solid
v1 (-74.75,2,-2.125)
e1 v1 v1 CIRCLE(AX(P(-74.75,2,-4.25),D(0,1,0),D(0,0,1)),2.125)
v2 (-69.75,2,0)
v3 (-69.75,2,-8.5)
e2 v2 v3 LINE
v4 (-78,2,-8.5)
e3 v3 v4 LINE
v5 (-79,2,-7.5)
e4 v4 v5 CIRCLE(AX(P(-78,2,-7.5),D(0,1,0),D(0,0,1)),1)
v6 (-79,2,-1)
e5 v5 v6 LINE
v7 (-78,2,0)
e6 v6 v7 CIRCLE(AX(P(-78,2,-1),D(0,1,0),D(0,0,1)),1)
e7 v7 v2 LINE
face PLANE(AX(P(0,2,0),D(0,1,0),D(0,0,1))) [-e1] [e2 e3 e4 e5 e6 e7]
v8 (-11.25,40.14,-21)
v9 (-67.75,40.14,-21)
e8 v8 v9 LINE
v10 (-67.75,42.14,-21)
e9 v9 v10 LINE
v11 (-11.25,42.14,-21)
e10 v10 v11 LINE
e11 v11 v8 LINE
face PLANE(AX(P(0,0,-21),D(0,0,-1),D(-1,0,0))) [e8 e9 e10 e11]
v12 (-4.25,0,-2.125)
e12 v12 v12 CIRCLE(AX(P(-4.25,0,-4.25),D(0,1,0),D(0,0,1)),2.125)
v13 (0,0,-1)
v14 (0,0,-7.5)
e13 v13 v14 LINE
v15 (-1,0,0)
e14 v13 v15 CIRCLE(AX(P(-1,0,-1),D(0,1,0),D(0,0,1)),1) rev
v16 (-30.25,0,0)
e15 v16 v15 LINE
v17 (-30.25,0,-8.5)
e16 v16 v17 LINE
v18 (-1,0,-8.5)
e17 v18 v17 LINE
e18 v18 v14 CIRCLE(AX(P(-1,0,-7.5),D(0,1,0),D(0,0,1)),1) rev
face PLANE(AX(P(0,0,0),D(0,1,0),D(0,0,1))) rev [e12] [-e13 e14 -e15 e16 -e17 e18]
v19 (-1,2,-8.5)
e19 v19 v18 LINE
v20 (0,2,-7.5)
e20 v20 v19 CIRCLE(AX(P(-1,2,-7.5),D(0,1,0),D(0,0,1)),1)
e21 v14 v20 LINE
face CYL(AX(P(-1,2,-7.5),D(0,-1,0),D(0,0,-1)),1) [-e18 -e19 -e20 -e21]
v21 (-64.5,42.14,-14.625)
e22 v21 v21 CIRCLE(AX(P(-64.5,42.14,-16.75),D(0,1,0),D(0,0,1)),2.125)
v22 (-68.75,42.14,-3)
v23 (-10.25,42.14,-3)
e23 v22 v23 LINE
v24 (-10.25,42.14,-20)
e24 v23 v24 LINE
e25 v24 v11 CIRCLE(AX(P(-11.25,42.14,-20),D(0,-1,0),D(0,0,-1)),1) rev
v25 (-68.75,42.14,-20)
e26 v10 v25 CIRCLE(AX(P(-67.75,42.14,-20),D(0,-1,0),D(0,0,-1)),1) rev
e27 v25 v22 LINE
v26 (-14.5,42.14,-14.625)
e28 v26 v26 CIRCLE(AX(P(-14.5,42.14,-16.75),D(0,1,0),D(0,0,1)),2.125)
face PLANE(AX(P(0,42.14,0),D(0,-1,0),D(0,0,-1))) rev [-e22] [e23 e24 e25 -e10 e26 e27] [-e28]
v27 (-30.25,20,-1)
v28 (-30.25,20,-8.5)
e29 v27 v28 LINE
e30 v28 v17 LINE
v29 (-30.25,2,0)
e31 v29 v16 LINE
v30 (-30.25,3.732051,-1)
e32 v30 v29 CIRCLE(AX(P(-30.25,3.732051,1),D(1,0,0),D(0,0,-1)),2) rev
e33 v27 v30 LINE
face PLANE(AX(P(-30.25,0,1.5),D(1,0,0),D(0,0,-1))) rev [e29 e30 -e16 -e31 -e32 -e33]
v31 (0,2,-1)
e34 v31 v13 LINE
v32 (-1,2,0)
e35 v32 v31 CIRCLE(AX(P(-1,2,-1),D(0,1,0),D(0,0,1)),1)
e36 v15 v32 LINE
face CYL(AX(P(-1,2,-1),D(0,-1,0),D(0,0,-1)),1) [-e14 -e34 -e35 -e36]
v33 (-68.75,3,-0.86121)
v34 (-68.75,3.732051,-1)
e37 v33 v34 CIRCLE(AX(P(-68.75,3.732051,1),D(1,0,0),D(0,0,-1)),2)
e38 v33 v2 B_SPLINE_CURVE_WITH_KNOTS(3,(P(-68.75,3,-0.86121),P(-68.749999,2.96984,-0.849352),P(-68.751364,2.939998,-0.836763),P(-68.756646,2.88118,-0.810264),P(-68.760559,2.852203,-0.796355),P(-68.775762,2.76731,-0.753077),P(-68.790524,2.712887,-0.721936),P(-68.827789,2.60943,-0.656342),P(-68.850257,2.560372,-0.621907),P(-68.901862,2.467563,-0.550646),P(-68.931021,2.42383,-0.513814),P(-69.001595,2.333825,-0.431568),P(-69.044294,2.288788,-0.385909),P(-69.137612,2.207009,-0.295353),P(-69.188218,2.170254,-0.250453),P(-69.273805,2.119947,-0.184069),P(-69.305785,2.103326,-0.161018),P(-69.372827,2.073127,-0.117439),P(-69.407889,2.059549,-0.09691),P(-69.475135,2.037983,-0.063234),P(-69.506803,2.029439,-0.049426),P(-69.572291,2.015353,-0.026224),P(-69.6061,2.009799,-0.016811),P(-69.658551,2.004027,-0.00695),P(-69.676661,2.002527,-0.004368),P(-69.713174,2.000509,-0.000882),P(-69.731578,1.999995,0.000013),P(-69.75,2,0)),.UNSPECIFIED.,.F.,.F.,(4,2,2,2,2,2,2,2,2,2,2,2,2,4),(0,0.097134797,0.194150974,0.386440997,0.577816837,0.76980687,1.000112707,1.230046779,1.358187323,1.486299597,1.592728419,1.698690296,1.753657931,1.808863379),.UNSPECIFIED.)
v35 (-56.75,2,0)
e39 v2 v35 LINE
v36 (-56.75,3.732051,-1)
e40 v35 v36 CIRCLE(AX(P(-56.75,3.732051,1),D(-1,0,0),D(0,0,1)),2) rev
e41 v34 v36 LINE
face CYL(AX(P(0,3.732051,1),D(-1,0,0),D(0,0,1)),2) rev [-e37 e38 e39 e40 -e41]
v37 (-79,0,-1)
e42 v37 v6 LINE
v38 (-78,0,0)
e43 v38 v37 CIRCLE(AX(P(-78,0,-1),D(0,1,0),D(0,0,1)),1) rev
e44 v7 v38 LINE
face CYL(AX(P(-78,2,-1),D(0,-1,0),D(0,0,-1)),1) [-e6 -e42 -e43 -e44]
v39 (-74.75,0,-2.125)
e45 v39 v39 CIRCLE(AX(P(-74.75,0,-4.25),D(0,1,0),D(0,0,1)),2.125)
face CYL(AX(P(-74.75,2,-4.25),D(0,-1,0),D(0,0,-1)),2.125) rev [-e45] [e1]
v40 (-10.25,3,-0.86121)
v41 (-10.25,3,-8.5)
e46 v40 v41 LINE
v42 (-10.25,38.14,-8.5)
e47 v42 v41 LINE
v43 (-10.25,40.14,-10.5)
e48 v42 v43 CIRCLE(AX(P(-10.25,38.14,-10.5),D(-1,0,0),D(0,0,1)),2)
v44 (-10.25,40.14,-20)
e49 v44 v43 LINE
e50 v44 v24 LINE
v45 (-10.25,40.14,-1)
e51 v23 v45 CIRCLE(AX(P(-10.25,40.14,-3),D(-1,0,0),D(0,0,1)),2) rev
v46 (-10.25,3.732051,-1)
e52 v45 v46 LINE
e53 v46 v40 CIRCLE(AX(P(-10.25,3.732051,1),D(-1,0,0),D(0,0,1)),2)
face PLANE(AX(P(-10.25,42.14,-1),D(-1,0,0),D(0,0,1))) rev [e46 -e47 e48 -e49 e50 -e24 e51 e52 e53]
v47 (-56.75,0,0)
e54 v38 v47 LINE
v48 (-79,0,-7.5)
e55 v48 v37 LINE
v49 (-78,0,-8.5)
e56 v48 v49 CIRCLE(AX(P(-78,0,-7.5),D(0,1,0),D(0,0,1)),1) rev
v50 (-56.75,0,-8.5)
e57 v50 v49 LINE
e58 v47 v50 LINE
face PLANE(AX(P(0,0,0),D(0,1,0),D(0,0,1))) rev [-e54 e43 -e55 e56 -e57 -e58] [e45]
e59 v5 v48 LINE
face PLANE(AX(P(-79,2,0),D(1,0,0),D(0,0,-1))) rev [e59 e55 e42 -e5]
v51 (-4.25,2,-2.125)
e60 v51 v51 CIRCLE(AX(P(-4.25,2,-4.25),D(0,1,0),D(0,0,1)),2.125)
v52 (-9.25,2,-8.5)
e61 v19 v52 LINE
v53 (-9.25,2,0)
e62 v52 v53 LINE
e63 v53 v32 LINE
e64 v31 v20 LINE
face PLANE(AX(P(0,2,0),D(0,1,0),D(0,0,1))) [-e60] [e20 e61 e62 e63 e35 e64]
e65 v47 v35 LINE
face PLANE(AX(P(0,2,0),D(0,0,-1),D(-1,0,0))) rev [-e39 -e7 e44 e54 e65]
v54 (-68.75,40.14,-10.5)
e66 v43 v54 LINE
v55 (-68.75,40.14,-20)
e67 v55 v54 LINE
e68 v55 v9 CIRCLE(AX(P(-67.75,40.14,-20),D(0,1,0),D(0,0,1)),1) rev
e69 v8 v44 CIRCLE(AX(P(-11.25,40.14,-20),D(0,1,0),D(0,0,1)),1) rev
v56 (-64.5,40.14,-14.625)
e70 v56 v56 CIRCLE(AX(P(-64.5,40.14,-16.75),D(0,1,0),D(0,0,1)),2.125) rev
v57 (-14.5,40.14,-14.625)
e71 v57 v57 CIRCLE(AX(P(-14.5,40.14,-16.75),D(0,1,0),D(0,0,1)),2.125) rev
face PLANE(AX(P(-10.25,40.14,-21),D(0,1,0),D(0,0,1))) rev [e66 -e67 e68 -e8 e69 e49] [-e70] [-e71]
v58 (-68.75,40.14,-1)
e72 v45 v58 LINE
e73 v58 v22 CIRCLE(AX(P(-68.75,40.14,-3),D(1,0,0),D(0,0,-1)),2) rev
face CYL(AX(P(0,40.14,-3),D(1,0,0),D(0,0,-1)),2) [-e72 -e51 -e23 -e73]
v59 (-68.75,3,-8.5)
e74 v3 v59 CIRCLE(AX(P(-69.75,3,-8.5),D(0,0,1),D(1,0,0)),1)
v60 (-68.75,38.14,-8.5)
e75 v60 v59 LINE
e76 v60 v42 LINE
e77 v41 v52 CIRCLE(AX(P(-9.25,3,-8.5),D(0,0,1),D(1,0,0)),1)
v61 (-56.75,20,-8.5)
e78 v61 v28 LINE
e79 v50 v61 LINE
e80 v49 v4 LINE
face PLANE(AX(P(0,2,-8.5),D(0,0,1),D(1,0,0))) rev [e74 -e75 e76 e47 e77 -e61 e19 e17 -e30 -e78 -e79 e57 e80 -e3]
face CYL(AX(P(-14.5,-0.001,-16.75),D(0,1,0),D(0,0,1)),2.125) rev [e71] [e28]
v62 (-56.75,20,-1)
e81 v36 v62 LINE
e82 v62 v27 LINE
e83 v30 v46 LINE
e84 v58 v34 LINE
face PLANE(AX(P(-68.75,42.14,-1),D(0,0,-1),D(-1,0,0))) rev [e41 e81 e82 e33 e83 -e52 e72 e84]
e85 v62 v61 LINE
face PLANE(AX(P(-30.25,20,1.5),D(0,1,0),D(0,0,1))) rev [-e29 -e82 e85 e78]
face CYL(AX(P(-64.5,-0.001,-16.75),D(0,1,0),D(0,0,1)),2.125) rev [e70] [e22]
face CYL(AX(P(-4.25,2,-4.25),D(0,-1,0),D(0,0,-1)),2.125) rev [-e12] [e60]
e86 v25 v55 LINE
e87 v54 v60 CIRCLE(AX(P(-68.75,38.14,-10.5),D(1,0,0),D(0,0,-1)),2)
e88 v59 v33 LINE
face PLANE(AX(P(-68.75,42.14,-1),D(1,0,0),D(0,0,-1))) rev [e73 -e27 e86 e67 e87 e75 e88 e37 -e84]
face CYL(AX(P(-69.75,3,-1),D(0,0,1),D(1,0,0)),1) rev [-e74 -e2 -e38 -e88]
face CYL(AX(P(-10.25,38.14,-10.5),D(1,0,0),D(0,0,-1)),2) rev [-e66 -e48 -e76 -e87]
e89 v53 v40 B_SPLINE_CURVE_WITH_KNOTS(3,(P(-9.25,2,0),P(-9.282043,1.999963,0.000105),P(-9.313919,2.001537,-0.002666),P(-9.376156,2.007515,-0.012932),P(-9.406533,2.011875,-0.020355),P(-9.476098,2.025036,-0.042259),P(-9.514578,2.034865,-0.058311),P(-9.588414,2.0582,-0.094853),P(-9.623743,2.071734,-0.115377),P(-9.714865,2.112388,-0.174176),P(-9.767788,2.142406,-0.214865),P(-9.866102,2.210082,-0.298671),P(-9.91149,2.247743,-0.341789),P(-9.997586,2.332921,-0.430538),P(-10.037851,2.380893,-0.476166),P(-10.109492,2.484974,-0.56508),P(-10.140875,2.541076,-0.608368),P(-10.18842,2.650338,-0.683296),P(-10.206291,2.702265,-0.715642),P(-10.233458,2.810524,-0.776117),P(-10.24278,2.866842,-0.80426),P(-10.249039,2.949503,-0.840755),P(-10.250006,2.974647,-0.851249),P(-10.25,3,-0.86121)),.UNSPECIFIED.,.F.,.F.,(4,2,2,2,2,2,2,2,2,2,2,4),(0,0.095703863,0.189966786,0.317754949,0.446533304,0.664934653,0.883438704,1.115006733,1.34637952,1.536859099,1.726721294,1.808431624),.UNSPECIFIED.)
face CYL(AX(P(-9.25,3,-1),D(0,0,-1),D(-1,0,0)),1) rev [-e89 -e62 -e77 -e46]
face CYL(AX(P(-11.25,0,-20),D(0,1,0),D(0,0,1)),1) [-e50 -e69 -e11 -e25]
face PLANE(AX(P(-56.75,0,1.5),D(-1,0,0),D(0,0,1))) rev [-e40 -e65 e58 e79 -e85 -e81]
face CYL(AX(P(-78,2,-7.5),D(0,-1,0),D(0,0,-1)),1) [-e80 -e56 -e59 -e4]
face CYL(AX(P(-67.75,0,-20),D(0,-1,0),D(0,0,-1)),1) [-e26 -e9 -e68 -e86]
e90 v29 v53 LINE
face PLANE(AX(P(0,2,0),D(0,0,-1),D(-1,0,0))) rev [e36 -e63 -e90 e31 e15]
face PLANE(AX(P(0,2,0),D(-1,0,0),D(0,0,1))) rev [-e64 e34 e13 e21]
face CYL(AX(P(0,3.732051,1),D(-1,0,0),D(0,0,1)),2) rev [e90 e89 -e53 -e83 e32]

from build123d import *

# Parameters (mm, degrees)
SKETCH1_W           = 79
SKETCH1_H           = 8.5
SKETCH1_R           = 2.125
BOSS_EXTRUDE1_DEPTH = 2
SKETCH3_W           = 58.5
SKETCH3_H           = 7.5
BOSS_EXTRUDE2_DEPTH = 40.14
SKETCH4_W           = 58.5
SKETCH4_H           = 2
BOSS_EXTRUDE3_DEPTH = 12.5
CUT_EXTRUDE1_REACH  = 93.966
SKETCH5_R           = 2.125
FILLET1_R           = 2
FILLET2_R           = 1
FILLET3_R           = 2
FILLET4_R           = 1
FILLET5_R           = 1
SKETCH6_W           = 26.5
SKETCH6_H           = 20
CUT_EXTRUDE2_DEPTH  = 10


with BuildPart() as part:
    # Sketch1 → Boss-Extrude1 (new body)
    with BuildSketch(Plane(origin=(0, 0, 0), x_dir=(1, 0, 0), z_dir=(0, 1, 0))):
        with Locations((-39.5, 4.25)):
            Rectangle(SKETCH1_W, SKETCH1_H)
        with Locations(Location((-74.75, 4.25, 0), (0, 0, 270))):
            Circle(SKETCH1_R, mode=Mode.SUBTRACT)
        with Locations(Location((-4.25, 4.25, 0), (0, 0, 270))):
            Circle(SKETCH1_R, mode=Mode.SUBTRACT)
    extrude(amount=BOSS_EXTRUDE1_DEPTH)

    # Sketch3 → Boss-Extrude2 (add)
    with BuildSketch(Plane(origin=(0, 2, 0), x_dir=(1, 0, 0), z_dir=(0, 1, 0))):
        with Locations((-39.5, 4.75)):
            Rectangle(SKETCH3_W, SKETCH3_H)
    extrude(amount=BOSS_EXTRUDE2_DEPTH)

    # Sketch4 → Boss-Extrude3 (add)
    with BuildSketch(Plane(origin=(0, 0, -8.5), x_dir=(-1, 0, 0), z_dir=(0, 0, -1))):
        with Locations((39.5, 41.14)):
            Rectangle(SKETCH4_W, SKETCH4_H)
    extrude(amount=BOSS_EXTRUDE3_DEPTH)

    # Sketch5 → Cut-Extrude1 (cut, up to next)
    with BuildSketch(Plane(origin=(0, 42.14, 0), x_dir=(1, 0, 0), z_dir=(0, 1, 0)), mode=Mode.PRIVATE) as cut_extrude1_sk1:
        with Locations(Location((-14.5, 16.75, 0), (0, 0, 270))):
            Circle(SKETCH5_R)
    cut_extrude1_tool1 = extrude(cut_extrude1_sk1.sketch, amount=-CUT_EXTRUDE1_REACH, mode=Mode.PRIVATE) & part.part
    # Sketch5 → Cut-Extrude1 (cut, up to next)
    with BuildSketch(Plane(origin=(0, 42.14, 0), x_dir=(1, 0, 0), z_dir=(0, 1, 0)), mode=Mode.PRIVATE) as cut_extrude1_sk2:
        with Locations(Location((-64.5, 16.75, 0), (0, 0, 270))):
            Circle(SKETCH5_R)
    cut_extrude1_tool2 = extrude(cut_extrude1_sk2.sketch, amount=-CUT_EXTRUDE1_REACH, mode=Mode.PRIVATE) & part.part
    add(cut_extrude1_tool1.solids().sort_by_distance((-14.5, 42.14, -16.75))[0], mode=Mode.SUBTRACT)
    add(cut_extrude1_tool2.solids().sort_by_distance((-64.5, 42.14, -16.75))[0], mode=Mode.SUBTRACT)

    # Fillet1
    # the kernel refuses this fillet: 2 mm, written as the material it adds along each edge
    with BuildSketch(Plane(origin=(-68.75, 40.14, -8.5), x_dir=(0, -1, 0), z_dir=(1, 0, 0))) as fillet1_piece_1:
        with BuildLine():
            CenterArc((FILLET1_R, FILLET1_R), FILLET1_R, 180, 90)
            Line((0, FILLET1_R), (-FILLET1_R * 0.02, FILLET1_R))
            Line((-FILLET1_R * 0.02, FILLET1_R), (-FILLET1_R * 0.02, -FILLET1_R * 0.02))
            Line((-FILLET1_R * 0.02, -FILLET1_R * 0.02), (FILLET1_R, -FILLET1_R * 0.02))
            Line((FILLET1_R, -FILLET1_R * 0.02), (FILLET1_R, 0))
        make_face()
    extrude(amount=58.5)
    with BuildSketch(Plane(origin=(-68.75, 2, -1), x_dir=(0, 0, 1), z_dir=(1, 0, 0))) as fillet1_piece_2:
        with BuildLine():
            CenterArc((2, -1.732050808), FILLET1_R, 120, 60)
            Line((0, -1.732050808), (-0.04, -1.732050808))
            Line((-0.04, -1.732050808), (-0.04, 0))
            Line((-0.04, 0), (0, 0.04))
            ThreePointArc((0, 0.04), (0.5, 0.04), (0.98, 0.034641016))
            Line((0.98, 0.034641016), (1, 0))
        make_face()
    extrude(amount=58.5)

    # Fillet2
    fillet2_edges = [part.edges().sort_by_distance(p)[0] for p in [
        (-79, 1, 0),
        (-79, 1, -8.5),
        (-68.75, 41.14, -21),
        (-10.25, 41.14, -21),
        (0, 1, -8.5),
        (0, 1, 0),
    ]]
    fillet(fillet2_edges, radius=FILLET2_R)

    # Fillet3
    fillet3_edges = [part.edges().sort_by_distance(p)[0] for p in [
        (-39.5, 42.14, -1),
    ]]
    fillet(fillet3_edges, radius=FILLET3_R)

    # Fillet4
    # the kernel refuses this fillet: 1 mm, written as the material it adds along each edge
    with BuildSketch(Plane(origin=(-10.25, 2, 0), x_dir=(0, 1, 0), z_dir=(0, 0, -1))) as fillet4_piece_1_section:
        with BuildLine():
            CenterArc((FILLET4_R, FILLET4_R), FILLET4_R, 180, 90)
            Line((0, FILLET4_R), (0, 0))
            Line((0, 0), (FILLET4_R, 0))
        make_face()
    fillet4_piece_1 = extrude(amount=8.5, mode=Mode.PRIVATE)
    fillet4_piece_1 = fillet4_piece_1 - Plane(origin=(-10.019982346, 3.732050808, 1), x_dir=(0, 0, 1), z_dir=(-1, 0, 0)) * Cylinder(2, 21, mode=Mode.PRIVATE)
    add(fillet4_piece_1)

    # Fillet5
    # the kernel refuses this fillet: 1 mm, written as the material it adds along each edge
    with BuildSketch(Plane(origin=(-68.75, 2, -8.5), x_dir=(-1, 0, 0), z_dir=(0, 0, 1))) as fillet5_piece_1_section:
        with BuildLine():
            CenterArc((FILLET5_R, -FILLET5_R), FILLET5_R, 90, 90)
            Line((0, -FILLET5_R), (0, 0))
            Line((0, 0), (FILLET5_R, 0))
        make_face()
    fillet5_piece_1 = extrude(amount=8.5, mode=Mode.PRIVATE)
    fillet5_piece_1 = fillet5_piece_1 - Plane(origin=(-68.980019627, 3.732050808, 1), x_dir=(0, 0, 1), z_dir=(-1, 0, 0)) * Cylinder(2, 21, mode=Mode.PRIVATE)
    add(fillet5_piece_1)

    # Sketch6 → Cut-Extrude2 (cut)
    with BuildSketch(Plane(origin=(0, 0, -8.5), x_dir=(-1, 0, 0), z_dir=(0, 0, -1))):
        with Locations((43.5, 10)):
            Rectangle(SKETCH6_W, SKETCH6_H)
    extrude(amount=-CUT_EXTRUDE2_DEPTH, mode=Mode.SUBTRACT)


solid = part.part
